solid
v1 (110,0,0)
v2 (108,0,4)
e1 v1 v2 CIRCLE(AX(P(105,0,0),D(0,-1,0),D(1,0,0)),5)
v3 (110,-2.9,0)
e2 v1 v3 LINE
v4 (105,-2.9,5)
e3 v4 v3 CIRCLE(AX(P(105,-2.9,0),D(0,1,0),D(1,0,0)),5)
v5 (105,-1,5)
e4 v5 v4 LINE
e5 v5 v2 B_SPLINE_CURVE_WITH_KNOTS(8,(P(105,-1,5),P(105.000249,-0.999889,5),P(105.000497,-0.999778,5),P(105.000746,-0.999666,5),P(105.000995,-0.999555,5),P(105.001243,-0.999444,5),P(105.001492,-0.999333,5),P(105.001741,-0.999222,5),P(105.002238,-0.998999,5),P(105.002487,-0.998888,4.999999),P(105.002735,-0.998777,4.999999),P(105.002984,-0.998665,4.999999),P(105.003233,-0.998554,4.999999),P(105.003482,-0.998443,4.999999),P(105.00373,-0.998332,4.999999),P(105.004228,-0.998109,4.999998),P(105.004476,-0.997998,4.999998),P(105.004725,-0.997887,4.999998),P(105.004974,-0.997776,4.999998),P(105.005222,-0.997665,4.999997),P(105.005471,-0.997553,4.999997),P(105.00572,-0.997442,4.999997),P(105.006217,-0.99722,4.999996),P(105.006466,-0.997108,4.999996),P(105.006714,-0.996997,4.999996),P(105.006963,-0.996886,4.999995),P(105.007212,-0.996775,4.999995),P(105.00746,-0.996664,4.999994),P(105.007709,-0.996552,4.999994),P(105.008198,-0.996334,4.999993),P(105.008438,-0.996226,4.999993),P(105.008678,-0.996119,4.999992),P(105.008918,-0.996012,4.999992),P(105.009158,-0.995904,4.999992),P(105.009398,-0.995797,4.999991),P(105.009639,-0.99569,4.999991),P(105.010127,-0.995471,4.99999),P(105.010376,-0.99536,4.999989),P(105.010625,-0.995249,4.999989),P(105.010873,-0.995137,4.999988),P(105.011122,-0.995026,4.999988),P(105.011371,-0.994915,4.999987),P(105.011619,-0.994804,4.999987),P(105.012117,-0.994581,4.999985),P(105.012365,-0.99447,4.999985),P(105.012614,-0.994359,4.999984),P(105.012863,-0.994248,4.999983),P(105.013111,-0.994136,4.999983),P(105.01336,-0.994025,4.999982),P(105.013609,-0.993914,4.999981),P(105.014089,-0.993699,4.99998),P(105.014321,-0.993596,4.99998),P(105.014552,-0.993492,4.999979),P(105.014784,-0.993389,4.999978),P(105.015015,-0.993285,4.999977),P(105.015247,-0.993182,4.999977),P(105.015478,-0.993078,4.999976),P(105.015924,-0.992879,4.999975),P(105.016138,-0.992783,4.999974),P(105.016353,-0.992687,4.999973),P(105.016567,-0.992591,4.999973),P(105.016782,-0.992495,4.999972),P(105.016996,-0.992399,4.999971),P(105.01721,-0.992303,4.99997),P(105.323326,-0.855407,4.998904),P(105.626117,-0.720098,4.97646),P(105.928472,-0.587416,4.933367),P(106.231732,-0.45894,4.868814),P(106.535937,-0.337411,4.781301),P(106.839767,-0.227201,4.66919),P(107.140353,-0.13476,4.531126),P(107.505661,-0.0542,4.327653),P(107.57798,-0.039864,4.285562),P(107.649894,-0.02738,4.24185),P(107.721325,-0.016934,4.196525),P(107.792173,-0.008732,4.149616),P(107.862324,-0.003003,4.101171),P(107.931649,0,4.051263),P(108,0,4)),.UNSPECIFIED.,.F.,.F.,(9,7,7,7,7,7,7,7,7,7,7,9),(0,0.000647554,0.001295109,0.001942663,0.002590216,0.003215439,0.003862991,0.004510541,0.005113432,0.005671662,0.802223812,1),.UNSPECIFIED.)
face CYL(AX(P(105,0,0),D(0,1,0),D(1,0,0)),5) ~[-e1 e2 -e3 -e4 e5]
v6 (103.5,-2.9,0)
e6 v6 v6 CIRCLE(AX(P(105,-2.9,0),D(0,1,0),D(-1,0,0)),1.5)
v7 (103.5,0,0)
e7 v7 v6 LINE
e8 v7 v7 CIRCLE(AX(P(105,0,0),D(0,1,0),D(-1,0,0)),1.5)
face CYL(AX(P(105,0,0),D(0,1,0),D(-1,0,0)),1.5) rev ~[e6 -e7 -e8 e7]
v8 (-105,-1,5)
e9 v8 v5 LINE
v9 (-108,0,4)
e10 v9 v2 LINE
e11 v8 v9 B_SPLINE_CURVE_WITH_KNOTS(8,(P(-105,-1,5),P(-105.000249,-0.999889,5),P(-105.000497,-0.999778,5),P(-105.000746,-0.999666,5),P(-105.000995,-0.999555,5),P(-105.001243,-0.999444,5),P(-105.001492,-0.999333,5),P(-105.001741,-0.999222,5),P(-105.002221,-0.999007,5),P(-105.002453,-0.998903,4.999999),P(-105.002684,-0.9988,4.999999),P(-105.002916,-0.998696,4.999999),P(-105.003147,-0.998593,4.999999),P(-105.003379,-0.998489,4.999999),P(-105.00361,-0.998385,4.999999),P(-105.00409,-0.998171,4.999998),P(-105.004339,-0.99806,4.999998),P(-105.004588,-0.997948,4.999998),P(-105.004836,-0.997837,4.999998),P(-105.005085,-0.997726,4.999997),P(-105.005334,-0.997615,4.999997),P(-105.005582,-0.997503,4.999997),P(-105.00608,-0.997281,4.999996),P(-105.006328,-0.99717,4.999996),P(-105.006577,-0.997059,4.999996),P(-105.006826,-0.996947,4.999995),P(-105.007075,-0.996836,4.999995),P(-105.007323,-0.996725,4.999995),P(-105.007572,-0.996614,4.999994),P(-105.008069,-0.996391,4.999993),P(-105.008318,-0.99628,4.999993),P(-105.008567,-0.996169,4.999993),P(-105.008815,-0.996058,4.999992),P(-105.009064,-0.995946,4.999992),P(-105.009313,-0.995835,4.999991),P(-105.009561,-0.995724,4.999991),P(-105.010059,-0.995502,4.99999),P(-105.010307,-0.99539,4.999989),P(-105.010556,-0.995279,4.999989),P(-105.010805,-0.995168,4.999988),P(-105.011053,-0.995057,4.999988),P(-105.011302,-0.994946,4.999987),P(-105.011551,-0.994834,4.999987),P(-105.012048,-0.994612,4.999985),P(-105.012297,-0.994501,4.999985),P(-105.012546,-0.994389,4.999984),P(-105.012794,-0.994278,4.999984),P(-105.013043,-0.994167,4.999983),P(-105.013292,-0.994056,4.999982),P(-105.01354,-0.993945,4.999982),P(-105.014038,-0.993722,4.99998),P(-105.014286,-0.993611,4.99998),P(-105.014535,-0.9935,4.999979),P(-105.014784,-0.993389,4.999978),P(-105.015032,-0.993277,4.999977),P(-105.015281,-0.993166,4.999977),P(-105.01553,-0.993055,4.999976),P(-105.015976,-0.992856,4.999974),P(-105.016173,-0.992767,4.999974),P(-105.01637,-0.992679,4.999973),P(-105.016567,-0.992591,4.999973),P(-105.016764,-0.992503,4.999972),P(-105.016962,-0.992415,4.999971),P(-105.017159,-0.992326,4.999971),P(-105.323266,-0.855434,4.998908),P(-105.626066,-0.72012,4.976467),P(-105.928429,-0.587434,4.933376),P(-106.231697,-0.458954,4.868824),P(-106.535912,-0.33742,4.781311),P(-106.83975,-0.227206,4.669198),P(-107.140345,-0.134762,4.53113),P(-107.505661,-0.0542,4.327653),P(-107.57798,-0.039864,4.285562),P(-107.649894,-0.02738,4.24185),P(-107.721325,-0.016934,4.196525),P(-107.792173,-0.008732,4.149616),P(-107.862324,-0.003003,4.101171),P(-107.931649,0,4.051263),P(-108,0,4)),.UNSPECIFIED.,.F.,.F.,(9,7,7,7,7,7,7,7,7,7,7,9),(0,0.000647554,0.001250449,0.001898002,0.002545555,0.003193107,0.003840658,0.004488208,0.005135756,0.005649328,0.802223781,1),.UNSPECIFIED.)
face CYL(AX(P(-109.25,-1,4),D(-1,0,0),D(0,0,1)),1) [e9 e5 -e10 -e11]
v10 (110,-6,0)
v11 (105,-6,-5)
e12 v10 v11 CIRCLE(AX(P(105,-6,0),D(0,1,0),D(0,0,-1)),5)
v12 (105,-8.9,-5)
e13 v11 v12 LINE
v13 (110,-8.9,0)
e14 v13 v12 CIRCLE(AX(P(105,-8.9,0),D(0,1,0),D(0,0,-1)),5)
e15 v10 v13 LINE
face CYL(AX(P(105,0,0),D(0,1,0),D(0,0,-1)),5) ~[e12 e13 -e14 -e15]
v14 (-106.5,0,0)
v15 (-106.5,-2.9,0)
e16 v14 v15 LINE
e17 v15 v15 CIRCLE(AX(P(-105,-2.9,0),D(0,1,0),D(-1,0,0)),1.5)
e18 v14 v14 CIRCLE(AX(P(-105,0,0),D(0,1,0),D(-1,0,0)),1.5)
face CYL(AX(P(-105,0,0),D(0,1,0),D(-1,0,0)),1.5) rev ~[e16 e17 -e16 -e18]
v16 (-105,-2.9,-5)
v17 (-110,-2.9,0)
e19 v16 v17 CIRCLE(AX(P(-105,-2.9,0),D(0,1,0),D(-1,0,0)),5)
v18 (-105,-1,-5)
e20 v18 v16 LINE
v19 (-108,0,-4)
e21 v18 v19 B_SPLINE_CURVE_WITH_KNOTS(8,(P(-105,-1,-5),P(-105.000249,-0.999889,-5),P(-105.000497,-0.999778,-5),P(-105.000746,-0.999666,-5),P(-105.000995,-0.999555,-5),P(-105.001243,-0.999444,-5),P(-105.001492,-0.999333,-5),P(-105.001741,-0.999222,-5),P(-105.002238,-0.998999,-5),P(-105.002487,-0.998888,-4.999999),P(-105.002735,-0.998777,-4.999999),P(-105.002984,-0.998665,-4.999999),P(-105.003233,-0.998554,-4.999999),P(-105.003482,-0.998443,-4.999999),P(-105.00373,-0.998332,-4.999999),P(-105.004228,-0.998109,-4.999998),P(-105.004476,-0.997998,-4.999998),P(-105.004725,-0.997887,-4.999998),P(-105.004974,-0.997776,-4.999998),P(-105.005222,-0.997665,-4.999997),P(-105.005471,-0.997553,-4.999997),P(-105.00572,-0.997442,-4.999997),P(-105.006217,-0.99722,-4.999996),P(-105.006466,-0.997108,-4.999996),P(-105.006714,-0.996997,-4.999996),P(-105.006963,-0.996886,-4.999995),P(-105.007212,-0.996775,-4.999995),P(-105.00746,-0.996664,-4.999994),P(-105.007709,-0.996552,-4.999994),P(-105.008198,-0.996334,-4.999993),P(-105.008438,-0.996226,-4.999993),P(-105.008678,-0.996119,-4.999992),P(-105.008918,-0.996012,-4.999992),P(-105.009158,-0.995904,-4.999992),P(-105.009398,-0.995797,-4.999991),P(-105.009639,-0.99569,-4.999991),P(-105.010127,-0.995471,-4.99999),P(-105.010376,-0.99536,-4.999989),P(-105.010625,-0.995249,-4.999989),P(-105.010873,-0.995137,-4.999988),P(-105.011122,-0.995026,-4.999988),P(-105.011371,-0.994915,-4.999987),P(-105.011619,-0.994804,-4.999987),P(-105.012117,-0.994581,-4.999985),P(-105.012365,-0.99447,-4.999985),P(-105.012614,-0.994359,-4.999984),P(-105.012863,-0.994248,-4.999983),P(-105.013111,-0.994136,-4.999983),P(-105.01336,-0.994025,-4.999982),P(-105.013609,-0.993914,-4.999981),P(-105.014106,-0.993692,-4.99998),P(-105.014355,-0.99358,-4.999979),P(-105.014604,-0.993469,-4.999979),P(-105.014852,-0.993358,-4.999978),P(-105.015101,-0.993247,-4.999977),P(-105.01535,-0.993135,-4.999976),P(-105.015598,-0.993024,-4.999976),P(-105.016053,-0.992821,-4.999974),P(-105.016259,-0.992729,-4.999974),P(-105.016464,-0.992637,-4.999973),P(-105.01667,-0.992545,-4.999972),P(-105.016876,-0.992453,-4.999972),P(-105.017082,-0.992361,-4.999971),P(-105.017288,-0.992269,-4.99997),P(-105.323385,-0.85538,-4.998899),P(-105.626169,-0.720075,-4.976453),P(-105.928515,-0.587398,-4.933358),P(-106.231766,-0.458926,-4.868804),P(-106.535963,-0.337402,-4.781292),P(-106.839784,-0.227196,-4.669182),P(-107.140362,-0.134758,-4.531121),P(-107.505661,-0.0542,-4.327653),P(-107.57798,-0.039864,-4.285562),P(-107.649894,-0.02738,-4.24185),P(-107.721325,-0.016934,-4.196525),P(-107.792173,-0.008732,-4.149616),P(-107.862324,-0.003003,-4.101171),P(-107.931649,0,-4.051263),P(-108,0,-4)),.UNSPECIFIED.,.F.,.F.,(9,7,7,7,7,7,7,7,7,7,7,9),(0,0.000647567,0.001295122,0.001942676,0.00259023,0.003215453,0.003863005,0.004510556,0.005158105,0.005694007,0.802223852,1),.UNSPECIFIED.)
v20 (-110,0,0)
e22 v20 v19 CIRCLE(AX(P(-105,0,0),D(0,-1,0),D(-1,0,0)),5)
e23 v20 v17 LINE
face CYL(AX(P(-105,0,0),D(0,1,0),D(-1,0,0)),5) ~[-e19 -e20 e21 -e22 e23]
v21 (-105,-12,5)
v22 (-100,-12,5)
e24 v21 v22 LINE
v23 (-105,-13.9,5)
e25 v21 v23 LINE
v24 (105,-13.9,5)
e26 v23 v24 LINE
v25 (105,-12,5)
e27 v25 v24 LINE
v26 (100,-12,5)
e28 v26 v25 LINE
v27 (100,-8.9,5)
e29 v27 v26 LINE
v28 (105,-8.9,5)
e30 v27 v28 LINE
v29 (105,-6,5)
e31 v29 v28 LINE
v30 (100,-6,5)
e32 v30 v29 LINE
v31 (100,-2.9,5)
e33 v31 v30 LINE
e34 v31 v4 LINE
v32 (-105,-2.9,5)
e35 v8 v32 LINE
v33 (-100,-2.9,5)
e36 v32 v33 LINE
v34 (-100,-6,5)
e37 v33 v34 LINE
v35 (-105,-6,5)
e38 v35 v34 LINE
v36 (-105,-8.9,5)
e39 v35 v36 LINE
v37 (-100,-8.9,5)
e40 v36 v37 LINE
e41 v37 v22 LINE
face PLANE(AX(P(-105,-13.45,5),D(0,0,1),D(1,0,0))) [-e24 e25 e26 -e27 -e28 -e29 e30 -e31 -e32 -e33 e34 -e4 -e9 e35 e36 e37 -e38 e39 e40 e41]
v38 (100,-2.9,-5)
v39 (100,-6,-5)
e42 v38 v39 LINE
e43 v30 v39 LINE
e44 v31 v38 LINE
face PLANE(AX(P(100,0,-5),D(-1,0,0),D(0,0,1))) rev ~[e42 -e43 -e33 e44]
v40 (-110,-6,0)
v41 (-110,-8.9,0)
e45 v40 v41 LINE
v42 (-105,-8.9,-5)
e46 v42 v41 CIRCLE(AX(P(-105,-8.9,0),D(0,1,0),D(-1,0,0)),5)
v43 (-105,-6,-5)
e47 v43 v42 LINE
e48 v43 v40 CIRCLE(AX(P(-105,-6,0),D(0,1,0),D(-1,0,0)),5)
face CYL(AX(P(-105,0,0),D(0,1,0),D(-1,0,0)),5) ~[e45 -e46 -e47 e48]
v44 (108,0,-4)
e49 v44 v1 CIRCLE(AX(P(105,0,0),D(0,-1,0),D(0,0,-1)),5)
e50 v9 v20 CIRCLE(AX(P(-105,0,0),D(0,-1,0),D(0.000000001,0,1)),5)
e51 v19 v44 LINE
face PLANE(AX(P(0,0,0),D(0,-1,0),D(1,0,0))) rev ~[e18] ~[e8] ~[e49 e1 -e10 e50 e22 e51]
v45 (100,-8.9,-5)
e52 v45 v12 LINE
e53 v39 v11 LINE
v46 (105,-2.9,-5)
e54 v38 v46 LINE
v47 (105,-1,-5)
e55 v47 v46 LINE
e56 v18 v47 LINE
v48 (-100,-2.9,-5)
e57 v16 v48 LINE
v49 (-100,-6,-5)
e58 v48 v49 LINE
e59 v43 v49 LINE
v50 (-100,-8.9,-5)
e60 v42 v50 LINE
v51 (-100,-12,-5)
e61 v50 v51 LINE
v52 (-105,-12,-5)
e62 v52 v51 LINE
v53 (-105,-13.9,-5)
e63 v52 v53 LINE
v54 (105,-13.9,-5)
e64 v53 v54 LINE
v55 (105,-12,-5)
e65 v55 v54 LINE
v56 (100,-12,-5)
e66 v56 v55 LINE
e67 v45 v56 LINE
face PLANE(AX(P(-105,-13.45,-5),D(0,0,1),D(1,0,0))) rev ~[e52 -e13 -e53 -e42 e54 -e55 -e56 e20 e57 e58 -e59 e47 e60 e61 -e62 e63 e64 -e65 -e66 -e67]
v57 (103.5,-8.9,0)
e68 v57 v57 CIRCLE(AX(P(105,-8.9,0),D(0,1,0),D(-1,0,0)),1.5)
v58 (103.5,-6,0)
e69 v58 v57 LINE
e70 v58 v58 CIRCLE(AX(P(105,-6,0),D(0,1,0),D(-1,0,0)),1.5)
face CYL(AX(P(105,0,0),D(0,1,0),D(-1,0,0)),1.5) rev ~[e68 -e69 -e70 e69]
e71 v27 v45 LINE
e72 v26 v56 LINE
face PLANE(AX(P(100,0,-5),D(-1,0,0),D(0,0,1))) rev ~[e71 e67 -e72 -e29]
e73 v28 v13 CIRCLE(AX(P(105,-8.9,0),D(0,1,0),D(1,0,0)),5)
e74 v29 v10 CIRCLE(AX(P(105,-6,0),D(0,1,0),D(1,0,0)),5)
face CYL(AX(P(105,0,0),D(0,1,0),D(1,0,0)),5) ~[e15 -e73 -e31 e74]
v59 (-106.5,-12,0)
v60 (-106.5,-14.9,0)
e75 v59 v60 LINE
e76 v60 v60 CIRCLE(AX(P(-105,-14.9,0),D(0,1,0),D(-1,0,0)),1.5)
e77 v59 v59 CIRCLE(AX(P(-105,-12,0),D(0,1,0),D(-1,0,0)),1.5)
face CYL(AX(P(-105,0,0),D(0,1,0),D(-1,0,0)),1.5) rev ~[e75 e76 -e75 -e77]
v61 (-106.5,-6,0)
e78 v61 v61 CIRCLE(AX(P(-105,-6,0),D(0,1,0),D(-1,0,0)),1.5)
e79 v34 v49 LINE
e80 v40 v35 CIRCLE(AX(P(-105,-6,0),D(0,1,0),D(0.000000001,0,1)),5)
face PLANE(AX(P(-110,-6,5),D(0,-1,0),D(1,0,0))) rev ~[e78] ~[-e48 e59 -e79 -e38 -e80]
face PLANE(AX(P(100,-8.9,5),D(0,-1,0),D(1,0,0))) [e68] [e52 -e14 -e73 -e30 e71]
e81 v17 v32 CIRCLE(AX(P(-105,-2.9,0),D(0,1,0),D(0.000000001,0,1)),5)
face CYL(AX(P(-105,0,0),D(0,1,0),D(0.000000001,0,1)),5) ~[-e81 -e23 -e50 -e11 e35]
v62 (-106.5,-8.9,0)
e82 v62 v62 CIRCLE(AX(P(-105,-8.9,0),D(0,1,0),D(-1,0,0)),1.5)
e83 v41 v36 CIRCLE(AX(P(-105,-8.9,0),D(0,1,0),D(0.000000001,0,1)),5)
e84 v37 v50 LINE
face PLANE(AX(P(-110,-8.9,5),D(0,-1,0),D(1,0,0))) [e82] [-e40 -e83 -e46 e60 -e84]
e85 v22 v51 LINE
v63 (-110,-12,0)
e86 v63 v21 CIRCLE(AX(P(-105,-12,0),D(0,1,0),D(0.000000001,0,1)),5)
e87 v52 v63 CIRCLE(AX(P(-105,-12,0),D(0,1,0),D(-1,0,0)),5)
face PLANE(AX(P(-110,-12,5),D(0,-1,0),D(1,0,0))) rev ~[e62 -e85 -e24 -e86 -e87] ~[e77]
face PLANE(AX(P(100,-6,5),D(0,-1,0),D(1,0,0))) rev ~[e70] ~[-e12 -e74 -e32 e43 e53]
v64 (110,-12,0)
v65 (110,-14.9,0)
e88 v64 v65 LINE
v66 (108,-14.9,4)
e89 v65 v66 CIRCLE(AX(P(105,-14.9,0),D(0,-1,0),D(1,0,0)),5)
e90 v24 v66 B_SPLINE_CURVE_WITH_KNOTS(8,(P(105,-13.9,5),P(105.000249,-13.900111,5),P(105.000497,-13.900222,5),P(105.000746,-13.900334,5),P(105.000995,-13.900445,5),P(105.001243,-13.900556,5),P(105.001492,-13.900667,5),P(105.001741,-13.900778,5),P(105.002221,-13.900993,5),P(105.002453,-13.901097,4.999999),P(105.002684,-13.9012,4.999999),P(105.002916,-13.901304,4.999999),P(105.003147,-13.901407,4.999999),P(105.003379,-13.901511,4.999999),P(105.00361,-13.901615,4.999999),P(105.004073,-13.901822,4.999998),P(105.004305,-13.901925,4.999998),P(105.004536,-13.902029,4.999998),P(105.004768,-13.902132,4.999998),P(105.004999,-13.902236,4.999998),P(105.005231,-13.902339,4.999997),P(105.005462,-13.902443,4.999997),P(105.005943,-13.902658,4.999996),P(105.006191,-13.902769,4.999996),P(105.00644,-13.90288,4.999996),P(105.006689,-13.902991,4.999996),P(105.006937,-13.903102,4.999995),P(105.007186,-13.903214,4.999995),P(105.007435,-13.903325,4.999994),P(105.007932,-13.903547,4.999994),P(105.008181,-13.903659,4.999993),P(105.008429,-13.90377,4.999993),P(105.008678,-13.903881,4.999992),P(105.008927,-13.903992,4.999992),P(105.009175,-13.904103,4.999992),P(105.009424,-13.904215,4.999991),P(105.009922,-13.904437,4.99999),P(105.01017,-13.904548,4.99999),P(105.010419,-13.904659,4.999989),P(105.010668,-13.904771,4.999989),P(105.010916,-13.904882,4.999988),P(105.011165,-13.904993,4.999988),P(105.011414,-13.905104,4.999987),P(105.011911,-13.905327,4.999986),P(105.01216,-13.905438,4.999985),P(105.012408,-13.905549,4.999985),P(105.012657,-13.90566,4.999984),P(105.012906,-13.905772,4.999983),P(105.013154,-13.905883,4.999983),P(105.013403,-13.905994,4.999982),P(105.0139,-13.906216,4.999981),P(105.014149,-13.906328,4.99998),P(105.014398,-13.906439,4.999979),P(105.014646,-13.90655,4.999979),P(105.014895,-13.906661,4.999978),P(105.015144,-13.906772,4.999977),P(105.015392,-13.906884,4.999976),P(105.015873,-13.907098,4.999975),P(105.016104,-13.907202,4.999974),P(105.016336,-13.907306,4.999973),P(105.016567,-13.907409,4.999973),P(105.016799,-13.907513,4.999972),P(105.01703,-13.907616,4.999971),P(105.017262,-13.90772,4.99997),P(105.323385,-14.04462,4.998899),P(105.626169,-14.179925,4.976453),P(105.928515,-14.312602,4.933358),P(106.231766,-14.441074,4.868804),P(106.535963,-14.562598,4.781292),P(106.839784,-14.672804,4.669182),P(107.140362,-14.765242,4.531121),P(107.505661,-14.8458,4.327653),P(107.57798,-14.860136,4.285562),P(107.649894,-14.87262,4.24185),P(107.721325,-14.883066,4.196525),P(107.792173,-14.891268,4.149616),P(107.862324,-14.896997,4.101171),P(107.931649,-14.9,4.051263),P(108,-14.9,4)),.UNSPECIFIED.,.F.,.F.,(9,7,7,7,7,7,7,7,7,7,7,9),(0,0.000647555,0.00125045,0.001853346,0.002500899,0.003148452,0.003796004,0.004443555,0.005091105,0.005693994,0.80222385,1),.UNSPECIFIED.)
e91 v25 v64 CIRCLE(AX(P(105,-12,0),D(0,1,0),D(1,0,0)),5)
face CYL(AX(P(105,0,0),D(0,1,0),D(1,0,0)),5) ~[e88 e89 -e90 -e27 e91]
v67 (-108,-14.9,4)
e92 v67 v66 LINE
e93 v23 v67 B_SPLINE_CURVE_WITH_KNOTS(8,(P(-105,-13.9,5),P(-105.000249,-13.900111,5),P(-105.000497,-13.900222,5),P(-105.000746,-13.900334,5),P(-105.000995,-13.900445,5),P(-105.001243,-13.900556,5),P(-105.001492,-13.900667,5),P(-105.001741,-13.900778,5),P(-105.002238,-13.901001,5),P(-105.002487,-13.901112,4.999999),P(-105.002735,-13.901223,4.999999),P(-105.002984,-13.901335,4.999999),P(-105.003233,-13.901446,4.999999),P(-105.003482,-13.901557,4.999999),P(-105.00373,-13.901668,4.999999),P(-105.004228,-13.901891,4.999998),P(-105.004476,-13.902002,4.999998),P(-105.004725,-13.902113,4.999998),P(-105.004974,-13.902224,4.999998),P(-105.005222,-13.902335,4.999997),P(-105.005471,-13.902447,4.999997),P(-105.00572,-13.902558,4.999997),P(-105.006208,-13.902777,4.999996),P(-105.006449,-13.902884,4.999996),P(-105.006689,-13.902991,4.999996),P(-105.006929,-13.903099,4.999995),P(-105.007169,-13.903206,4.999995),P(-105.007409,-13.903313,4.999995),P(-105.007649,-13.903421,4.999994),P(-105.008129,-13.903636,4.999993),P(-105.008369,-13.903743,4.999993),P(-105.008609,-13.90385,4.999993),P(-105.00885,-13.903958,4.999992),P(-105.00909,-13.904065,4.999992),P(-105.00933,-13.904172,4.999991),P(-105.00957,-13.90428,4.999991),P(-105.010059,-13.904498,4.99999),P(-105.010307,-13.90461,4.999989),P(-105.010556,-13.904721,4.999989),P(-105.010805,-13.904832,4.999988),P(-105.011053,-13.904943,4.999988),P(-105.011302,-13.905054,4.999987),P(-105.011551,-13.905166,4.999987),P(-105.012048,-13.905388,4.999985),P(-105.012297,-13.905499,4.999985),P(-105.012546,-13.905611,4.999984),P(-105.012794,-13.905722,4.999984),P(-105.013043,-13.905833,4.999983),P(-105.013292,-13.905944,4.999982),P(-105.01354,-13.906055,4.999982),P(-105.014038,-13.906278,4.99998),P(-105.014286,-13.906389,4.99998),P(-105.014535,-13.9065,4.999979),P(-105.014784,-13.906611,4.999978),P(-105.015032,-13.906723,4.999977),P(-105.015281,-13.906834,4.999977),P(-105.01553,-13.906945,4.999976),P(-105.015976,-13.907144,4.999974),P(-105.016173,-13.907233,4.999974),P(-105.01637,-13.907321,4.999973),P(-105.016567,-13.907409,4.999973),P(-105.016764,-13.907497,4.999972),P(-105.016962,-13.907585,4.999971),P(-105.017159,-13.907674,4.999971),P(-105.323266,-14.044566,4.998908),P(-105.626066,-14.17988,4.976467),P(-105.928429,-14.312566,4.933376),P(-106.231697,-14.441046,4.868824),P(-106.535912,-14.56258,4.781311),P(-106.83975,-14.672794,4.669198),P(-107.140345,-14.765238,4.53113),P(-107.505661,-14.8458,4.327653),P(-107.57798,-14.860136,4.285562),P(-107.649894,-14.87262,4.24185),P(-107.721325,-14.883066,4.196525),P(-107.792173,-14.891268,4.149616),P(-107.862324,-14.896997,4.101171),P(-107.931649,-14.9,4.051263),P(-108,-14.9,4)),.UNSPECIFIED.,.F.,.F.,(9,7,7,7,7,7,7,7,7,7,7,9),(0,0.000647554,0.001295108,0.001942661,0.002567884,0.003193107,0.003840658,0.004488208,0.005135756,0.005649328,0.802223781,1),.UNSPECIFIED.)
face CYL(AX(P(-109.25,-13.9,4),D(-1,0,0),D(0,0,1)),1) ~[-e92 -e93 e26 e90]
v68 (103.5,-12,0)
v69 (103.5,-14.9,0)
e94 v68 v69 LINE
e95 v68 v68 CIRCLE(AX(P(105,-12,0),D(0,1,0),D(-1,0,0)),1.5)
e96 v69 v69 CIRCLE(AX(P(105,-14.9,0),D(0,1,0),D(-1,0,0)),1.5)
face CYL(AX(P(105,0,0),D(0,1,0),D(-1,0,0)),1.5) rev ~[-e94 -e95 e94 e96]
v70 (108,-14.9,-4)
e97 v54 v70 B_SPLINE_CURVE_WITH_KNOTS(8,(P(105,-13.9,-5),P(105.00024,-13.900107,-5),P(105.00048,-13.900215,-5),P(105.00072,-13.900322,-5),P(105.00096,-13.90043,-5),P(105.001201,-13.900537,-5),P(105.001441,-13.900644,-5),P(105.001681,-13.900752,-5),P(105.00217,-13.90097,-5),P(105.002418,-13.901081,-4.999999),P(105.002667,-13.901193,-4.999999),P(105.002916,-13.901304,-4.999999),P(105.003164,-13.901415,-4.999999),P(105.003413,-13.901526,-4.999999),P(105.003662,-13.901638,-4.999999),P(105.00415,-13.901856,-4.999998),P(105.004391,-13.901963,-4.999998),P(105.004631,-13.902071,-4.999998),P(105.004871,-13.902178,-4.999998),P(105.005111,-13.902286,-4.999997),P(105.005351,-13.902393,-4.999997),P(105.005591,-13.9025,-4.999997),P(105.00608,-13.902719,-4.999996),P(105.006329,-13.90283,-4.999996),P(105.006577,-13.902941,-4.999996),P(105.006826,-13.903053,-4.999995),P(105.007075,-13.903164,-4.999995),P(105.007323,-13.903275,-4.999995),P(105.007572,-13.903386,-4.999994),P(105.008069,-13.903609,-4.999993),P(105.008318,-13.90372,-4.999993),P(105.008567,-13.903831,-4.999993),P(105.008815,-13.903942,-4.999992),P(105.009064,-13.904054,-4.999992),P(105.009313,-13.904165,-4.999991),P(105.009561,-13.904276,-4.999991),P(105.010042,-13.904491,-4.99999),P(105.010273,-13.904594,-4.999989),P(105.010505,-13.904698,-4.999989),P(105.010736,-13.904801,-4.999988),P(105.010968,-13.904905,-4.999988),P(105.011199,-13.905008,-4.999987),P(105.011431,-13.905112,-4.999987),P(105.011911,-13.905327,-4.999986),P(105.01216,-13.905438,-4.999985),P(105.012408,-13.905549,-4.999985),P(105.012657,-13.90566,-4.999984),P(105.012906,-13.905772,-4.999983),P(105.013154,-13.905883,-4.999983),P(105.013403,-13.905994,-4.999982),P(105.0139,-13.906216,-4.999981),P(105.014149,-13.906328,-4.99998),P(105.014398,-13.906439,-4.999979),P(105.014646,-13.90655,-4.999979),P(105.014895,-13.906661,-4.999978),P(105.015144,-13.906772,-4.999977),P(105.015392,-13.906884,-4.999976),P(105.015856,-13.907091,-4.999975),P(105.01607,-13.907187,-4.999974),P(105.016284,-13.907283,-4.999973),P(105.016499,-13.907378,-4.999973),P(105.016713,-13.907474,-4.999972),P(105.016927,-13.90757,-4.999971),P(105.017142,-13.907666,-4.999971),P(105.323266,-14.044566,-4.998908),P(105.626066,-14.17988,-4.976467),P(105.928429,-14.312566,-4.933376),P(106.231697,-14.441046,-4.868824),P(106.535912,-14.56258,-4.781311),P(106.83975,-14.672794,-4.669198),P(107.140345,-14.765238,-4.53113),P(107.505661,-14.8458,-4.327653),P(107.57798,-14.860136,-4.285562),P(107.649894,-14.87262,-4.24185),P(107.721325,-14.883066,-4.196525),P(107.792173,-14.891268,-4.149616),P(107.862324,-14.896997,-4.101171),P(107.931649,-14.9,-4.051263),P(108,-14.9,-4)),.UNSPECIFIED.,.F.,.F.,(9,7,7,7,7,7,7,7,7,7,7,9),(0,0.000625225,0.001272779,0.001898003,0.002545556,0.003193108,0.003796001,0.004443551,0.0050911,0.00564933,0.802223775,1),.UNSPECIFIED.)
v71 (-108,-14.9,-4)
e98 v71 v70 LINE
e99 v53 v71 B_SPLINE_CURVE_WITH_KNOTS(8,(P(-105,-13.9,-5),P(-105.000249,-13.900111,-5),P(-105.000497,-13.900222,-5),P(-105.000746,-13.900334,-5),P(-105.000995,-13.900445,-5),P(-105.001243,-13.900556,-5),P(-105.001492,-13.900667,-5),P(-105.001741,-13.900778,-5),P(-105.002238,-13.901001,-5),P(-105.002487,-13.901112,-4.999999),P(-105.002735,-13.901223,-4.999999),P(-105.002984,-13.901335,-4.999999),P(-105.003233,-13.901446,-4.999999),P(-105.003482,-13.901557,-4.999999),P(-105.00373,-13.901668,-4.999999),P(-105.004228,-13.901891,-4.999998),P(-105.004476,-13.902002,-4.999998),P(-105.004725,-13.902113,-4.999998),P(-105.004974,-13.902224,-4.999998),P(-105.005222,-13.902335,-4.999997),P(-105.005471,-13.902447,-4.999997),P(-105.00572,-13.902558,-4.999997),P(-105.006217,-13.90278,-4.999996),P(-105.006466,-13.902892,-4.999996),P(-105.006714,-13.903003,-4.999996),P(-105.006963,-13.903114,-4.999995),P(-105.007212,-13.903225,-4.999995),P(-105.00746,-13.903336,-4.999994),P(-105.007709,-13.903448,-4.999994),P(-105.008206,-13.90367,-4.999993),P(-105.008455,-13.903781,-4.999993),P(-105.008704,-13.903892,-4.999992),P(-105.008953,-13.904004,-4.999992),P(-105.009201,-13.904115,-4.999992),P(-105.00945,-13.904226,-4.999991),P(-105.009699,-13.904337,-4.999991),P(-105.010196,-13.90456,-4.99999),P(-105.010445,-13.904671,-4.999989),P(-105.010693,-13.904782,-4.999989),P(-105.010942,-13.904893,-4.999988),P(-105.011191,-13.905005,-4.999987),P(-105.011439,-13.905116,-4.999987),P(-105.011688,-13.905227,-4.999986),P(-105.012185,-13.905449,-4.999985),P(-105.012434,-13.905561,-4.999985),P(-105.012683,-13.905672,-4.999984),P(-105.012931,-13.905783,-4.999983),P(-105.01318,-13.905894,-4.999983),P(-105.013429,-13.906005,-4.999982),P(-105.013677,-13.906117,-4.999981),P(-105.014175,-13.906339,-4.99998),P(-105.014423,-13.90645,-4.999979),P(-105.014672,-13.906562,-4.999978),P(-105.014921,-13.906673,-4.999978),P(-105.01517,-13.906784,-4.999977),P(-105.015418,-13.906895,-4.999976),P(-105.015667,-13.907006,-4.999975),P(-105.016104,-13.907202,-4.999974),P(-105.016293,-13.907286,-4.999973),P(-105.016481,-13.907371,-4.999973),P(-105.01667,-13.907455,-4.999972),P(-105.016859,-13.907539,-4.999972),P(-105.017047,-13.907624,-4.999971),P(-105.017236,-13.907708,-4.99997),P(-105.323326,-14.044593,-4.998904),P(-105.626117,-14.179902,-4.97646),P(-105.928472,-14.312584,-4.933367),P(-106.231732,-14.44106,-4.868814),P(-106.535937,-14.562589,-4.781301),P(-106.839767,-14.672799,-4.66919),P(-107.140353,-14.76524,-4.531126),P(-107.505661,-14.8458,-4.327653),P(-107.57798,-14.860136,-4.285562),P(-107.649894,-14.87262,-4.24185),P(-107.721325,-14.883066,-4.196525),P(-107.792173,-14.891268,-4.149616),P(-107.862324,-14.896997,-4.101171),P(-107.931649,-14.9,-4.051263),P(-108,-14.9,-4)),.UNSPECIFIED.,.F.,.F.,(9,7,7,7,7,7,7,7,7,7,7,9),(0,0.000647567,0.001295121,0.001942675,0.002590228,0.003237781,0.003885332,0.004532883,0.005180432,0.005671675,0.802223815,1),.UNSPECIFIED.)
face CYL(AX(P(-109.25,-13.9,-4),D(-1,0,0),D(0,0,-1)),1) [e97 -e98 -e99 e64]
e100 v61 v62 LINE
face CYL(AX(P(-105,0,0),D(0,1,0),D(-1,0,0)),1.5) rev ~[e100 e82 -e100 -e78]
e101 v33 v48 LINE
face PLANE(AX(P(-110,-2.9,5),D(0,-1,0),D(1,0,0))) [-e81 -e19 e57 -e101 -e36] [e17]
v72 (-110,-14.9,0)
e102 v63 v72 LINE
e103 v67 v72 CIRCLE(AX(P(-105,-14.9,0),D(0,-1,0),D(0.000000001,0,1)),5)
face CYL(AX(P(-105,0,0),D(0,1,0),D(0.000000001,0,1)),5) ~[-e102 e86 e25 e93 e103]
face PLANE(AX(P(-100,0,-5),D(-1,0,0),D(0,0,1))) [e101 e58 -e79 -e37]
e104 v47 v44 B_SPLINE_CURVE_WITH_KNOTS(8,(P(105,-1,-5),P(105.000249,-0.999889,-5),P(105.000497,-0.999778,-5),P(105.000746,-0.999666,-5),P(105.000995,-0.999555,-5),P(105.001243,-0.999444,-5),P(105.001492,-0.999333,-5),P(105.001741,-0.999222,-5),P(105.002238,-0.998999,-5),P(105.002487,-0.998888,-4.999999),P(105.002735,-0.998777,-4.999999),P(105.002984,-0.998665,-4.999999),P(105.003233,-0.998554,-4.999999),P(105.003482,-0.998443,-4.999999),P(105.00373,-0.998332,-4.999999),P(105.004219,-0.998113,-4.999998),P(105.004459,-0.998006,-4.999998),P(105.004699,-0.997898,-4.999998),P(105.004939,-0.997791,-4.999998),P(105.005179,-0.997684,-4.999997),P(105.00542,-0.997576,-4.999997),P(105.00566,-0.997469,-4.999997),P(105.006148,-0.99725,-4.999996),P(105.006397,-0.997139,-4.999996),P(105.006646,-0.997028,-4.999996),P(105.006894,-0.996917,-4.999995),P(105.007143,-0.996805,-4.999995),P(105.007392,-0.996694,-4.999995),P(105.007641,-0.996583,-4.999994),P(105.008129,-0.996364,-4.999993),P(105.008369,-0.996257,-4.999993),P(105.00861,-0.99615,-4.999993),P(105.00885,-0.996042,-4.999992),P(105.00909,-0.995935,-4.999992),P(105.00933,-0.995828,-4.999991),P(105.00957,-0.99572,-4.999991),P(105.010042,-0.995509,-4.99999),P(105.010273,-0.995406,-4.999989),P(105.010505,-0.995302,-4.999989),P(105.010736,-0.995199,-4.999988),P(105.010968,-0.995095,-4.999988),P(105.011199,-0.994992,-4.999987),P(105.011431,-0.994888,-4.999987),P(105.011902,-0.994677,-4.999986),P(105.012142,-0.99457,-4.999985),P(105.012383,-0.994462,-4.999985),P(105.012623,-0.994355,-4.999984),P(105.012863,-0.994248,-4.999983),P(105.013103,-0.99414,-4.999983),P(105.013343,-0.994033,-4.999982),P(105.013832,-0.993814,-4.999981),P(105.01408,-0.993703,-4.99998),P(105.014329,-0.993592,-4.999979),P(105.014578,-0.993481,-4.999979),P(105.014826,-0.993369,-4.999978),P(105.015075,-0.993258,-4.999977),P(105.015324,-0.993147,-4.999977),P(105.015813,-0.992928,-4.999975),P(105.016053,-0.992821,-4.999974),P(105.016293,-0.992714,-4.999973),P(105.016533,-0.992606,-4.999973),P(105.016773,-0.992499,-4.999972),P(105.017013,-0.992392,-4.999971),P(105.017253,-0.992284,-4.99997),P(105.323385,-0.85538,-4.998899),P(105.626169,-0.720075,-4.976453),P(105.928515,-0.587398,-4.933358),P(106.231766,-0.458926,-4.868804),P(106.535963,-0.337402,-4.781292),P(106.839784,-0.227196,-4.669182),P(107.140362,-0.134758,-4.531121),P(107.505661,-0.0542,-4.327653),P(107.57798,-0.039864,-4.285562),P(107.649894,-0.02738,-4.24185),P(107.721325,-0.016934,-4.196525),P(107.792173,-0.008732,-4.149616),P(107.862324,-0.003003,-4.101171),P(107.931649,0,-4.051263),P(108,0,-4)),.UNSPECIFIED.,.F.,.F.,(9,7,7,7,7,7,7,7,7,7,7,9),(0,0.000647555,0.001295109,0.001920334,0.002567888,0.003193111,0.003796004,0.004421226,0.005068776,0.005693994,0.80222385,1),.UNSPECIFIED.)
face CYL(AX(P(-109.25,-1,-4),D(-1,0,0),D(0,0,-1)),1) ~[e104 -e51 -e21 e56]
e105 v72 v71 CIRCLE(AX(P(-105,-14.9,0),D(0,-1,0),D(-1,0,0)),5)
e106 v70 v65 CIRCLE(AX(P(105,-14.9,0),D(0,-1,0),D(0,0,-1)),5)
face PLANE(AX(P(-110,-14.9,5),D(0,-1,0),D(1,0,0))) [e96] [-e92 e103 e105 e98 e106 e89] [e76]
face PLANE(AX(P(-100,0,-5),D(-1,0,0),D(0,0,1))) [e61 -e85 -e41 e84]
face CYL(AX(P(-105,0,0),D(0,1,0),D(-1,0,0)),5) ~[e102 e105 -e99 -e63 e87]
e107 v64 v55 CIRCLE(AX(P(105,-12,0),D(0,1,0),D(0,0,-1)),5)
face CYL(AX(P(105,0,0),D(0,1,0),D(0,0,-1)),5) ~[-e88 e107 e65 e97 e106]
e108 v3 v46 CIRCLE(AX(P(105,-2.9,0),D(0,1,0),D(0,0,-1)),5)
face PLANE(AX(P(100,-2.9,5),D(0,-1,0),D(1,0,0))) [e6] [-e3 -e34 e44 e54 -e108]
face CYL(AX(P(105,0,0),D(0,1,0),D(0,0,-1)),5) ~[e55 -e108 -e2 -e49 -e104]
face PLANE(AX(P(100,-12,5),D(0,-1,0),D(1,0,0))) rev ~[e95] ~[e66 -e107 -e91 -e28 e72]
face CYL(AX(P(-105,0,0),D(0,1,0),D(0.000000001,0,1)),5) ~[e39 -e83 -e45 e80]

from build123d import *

# Parameters (mm, degrees)
F0_W        = 200
F0_H        = 10
F1_DEPTH    = 14.9
F2_W        = 10
F2_H        = 2.9
F3_DEPTH    = 10
F4_R        = 1.5
F5_DEPTH    = 14.9
F6_T1_DEPTH = 218.4999999506
F6_T3_DEPTH = 218.4999999928


# Not quite as in the source:
# - a fillet or chamfer that OpenCascade refuses, or shapes differently, is made with other operations: its cross-section is extruded or revolved along the edge and cut away or added


with BuildPart() as f1:
    # F0 (on Front) → F1 (new body)
    with BuildSketch(Plane.XZ):
        Rectangle(F0_W, F0_H)
    extrude(amount=F1_DEPTH)

    # F2 (on face) → F3 (join)
    with BuildSketch(Plane.XY.offset(5)):
        with Locations((-105, -13.45)):
            Rectangle(F2_W, F2_H)
        with Locations((-105, -7.45)):
            Rectangle(F2_W, F2_H)
        with Locations((-105, -1.45)):
            Rectangle(F2_W, F2_H)
        with Locations((105, -13.45)):
            Rectangle(F2_W, F2_H)
        with Locations((105, -7.45)):
            Rectangle(F2_W, F2_H)
        with Locations((105, -1.45)):
            Rectangle(F2_W, F2_H)
    extrude(amount=-F3_DEPTH)

    # F4 (on face) → F5 (cut)
    with BuildSketch(Plane(origin=(0, 0, 0), x_dir=(-1, 0, 0), z_dir=(0, 1, 0))):
        with BuildLine():
            ThreePointArc((-110, 0), (-108.5355339059, 3.5355339059), (-105, 5))
            Line((-105, 5), (-110, 5))
            Line((-110, 5), (-110, 0))
        make_face()
        with BuildLine():
            Line((-110, -5), (-105, -5))
            ThreePointArc((-105, -5), (-108.5355339059, -3.5355339059), (-110, 0))
            Line((-110, 0), (-110, -5))
        make_face()
        with Locations((-105, 0)):
            Circle(F4_R)
        with BuildLine():
            ThreePointArc((110, 0), (108.5355338885, -3.5355339234), (104.9999999506, -5))
            Line((104.9999999506, -5), (110, -5))
            Line((110, -5), (110, 0))
        make_face()
        with BuildLine():
            Line((110, 5), (104.9999999928, 5))
            ThreePointArc((104.9999999928, 5), (108.5355339034, 3.5355339085), (110, 0))
            Line((110, 0), (110, 5))
        make_face()
        with Locations((105, 0)):
            Circle(F4_R)
    extrude(amount=-F5_DEPTH, mode=Mode.SUBTRACT)

    # F6: fillet of radius 1 on 4 edges, made by hand

    # F6_s2 → F6_t1 (cut)
    with BuildSketch(Plane.YZ.offset(-109.2499999506)):
        with BuildLine():
            ThreePointArc((-1, -5), (-0.2928932188, -4.7071067812), (0, -4))
            Line((0, -4), (0, -5))
            Line((0, -5), (-1, -5))
        make_face()
        with BuildLine():
            ThreePointArc((-13.9, -5), (-14.6071067812, -4.7071067812), (-14.9, -4))
            Line((-14.9, -4), (-14.9, -5))
            Line((-14.9, -5), (-13.9, -5))
        make_face()
    extrude(amount=F6_T1_DEPTH, mode=Mode.SUBTRACT)

    # F6_s4 → F6_t3 (cut)
    with BuildSketch(Plane.YZ.offset(-109.2499999928)):
        with BuildLine():
            ThreePointArc((-1, 5), (-0.2928932188, 4.7071067812), (0, 4))
            Line((0, 4), (0, 5))
            Line((0, 5), (-1, 5))
        make_face()
        with BuildLine():
            ThreePointArc((-13.9, 5), (-14.6071067812, 4.7071067812), (-14.9, 4))
            Line((-14.9, 4), (-14.9, 5))
            Line((-14.9, 5), (-13.9, 5))
        make_face()
    extrude(amount=F6_T3_DEPTH, mode=Mode.SUBTRACT)


solid = f1.part
